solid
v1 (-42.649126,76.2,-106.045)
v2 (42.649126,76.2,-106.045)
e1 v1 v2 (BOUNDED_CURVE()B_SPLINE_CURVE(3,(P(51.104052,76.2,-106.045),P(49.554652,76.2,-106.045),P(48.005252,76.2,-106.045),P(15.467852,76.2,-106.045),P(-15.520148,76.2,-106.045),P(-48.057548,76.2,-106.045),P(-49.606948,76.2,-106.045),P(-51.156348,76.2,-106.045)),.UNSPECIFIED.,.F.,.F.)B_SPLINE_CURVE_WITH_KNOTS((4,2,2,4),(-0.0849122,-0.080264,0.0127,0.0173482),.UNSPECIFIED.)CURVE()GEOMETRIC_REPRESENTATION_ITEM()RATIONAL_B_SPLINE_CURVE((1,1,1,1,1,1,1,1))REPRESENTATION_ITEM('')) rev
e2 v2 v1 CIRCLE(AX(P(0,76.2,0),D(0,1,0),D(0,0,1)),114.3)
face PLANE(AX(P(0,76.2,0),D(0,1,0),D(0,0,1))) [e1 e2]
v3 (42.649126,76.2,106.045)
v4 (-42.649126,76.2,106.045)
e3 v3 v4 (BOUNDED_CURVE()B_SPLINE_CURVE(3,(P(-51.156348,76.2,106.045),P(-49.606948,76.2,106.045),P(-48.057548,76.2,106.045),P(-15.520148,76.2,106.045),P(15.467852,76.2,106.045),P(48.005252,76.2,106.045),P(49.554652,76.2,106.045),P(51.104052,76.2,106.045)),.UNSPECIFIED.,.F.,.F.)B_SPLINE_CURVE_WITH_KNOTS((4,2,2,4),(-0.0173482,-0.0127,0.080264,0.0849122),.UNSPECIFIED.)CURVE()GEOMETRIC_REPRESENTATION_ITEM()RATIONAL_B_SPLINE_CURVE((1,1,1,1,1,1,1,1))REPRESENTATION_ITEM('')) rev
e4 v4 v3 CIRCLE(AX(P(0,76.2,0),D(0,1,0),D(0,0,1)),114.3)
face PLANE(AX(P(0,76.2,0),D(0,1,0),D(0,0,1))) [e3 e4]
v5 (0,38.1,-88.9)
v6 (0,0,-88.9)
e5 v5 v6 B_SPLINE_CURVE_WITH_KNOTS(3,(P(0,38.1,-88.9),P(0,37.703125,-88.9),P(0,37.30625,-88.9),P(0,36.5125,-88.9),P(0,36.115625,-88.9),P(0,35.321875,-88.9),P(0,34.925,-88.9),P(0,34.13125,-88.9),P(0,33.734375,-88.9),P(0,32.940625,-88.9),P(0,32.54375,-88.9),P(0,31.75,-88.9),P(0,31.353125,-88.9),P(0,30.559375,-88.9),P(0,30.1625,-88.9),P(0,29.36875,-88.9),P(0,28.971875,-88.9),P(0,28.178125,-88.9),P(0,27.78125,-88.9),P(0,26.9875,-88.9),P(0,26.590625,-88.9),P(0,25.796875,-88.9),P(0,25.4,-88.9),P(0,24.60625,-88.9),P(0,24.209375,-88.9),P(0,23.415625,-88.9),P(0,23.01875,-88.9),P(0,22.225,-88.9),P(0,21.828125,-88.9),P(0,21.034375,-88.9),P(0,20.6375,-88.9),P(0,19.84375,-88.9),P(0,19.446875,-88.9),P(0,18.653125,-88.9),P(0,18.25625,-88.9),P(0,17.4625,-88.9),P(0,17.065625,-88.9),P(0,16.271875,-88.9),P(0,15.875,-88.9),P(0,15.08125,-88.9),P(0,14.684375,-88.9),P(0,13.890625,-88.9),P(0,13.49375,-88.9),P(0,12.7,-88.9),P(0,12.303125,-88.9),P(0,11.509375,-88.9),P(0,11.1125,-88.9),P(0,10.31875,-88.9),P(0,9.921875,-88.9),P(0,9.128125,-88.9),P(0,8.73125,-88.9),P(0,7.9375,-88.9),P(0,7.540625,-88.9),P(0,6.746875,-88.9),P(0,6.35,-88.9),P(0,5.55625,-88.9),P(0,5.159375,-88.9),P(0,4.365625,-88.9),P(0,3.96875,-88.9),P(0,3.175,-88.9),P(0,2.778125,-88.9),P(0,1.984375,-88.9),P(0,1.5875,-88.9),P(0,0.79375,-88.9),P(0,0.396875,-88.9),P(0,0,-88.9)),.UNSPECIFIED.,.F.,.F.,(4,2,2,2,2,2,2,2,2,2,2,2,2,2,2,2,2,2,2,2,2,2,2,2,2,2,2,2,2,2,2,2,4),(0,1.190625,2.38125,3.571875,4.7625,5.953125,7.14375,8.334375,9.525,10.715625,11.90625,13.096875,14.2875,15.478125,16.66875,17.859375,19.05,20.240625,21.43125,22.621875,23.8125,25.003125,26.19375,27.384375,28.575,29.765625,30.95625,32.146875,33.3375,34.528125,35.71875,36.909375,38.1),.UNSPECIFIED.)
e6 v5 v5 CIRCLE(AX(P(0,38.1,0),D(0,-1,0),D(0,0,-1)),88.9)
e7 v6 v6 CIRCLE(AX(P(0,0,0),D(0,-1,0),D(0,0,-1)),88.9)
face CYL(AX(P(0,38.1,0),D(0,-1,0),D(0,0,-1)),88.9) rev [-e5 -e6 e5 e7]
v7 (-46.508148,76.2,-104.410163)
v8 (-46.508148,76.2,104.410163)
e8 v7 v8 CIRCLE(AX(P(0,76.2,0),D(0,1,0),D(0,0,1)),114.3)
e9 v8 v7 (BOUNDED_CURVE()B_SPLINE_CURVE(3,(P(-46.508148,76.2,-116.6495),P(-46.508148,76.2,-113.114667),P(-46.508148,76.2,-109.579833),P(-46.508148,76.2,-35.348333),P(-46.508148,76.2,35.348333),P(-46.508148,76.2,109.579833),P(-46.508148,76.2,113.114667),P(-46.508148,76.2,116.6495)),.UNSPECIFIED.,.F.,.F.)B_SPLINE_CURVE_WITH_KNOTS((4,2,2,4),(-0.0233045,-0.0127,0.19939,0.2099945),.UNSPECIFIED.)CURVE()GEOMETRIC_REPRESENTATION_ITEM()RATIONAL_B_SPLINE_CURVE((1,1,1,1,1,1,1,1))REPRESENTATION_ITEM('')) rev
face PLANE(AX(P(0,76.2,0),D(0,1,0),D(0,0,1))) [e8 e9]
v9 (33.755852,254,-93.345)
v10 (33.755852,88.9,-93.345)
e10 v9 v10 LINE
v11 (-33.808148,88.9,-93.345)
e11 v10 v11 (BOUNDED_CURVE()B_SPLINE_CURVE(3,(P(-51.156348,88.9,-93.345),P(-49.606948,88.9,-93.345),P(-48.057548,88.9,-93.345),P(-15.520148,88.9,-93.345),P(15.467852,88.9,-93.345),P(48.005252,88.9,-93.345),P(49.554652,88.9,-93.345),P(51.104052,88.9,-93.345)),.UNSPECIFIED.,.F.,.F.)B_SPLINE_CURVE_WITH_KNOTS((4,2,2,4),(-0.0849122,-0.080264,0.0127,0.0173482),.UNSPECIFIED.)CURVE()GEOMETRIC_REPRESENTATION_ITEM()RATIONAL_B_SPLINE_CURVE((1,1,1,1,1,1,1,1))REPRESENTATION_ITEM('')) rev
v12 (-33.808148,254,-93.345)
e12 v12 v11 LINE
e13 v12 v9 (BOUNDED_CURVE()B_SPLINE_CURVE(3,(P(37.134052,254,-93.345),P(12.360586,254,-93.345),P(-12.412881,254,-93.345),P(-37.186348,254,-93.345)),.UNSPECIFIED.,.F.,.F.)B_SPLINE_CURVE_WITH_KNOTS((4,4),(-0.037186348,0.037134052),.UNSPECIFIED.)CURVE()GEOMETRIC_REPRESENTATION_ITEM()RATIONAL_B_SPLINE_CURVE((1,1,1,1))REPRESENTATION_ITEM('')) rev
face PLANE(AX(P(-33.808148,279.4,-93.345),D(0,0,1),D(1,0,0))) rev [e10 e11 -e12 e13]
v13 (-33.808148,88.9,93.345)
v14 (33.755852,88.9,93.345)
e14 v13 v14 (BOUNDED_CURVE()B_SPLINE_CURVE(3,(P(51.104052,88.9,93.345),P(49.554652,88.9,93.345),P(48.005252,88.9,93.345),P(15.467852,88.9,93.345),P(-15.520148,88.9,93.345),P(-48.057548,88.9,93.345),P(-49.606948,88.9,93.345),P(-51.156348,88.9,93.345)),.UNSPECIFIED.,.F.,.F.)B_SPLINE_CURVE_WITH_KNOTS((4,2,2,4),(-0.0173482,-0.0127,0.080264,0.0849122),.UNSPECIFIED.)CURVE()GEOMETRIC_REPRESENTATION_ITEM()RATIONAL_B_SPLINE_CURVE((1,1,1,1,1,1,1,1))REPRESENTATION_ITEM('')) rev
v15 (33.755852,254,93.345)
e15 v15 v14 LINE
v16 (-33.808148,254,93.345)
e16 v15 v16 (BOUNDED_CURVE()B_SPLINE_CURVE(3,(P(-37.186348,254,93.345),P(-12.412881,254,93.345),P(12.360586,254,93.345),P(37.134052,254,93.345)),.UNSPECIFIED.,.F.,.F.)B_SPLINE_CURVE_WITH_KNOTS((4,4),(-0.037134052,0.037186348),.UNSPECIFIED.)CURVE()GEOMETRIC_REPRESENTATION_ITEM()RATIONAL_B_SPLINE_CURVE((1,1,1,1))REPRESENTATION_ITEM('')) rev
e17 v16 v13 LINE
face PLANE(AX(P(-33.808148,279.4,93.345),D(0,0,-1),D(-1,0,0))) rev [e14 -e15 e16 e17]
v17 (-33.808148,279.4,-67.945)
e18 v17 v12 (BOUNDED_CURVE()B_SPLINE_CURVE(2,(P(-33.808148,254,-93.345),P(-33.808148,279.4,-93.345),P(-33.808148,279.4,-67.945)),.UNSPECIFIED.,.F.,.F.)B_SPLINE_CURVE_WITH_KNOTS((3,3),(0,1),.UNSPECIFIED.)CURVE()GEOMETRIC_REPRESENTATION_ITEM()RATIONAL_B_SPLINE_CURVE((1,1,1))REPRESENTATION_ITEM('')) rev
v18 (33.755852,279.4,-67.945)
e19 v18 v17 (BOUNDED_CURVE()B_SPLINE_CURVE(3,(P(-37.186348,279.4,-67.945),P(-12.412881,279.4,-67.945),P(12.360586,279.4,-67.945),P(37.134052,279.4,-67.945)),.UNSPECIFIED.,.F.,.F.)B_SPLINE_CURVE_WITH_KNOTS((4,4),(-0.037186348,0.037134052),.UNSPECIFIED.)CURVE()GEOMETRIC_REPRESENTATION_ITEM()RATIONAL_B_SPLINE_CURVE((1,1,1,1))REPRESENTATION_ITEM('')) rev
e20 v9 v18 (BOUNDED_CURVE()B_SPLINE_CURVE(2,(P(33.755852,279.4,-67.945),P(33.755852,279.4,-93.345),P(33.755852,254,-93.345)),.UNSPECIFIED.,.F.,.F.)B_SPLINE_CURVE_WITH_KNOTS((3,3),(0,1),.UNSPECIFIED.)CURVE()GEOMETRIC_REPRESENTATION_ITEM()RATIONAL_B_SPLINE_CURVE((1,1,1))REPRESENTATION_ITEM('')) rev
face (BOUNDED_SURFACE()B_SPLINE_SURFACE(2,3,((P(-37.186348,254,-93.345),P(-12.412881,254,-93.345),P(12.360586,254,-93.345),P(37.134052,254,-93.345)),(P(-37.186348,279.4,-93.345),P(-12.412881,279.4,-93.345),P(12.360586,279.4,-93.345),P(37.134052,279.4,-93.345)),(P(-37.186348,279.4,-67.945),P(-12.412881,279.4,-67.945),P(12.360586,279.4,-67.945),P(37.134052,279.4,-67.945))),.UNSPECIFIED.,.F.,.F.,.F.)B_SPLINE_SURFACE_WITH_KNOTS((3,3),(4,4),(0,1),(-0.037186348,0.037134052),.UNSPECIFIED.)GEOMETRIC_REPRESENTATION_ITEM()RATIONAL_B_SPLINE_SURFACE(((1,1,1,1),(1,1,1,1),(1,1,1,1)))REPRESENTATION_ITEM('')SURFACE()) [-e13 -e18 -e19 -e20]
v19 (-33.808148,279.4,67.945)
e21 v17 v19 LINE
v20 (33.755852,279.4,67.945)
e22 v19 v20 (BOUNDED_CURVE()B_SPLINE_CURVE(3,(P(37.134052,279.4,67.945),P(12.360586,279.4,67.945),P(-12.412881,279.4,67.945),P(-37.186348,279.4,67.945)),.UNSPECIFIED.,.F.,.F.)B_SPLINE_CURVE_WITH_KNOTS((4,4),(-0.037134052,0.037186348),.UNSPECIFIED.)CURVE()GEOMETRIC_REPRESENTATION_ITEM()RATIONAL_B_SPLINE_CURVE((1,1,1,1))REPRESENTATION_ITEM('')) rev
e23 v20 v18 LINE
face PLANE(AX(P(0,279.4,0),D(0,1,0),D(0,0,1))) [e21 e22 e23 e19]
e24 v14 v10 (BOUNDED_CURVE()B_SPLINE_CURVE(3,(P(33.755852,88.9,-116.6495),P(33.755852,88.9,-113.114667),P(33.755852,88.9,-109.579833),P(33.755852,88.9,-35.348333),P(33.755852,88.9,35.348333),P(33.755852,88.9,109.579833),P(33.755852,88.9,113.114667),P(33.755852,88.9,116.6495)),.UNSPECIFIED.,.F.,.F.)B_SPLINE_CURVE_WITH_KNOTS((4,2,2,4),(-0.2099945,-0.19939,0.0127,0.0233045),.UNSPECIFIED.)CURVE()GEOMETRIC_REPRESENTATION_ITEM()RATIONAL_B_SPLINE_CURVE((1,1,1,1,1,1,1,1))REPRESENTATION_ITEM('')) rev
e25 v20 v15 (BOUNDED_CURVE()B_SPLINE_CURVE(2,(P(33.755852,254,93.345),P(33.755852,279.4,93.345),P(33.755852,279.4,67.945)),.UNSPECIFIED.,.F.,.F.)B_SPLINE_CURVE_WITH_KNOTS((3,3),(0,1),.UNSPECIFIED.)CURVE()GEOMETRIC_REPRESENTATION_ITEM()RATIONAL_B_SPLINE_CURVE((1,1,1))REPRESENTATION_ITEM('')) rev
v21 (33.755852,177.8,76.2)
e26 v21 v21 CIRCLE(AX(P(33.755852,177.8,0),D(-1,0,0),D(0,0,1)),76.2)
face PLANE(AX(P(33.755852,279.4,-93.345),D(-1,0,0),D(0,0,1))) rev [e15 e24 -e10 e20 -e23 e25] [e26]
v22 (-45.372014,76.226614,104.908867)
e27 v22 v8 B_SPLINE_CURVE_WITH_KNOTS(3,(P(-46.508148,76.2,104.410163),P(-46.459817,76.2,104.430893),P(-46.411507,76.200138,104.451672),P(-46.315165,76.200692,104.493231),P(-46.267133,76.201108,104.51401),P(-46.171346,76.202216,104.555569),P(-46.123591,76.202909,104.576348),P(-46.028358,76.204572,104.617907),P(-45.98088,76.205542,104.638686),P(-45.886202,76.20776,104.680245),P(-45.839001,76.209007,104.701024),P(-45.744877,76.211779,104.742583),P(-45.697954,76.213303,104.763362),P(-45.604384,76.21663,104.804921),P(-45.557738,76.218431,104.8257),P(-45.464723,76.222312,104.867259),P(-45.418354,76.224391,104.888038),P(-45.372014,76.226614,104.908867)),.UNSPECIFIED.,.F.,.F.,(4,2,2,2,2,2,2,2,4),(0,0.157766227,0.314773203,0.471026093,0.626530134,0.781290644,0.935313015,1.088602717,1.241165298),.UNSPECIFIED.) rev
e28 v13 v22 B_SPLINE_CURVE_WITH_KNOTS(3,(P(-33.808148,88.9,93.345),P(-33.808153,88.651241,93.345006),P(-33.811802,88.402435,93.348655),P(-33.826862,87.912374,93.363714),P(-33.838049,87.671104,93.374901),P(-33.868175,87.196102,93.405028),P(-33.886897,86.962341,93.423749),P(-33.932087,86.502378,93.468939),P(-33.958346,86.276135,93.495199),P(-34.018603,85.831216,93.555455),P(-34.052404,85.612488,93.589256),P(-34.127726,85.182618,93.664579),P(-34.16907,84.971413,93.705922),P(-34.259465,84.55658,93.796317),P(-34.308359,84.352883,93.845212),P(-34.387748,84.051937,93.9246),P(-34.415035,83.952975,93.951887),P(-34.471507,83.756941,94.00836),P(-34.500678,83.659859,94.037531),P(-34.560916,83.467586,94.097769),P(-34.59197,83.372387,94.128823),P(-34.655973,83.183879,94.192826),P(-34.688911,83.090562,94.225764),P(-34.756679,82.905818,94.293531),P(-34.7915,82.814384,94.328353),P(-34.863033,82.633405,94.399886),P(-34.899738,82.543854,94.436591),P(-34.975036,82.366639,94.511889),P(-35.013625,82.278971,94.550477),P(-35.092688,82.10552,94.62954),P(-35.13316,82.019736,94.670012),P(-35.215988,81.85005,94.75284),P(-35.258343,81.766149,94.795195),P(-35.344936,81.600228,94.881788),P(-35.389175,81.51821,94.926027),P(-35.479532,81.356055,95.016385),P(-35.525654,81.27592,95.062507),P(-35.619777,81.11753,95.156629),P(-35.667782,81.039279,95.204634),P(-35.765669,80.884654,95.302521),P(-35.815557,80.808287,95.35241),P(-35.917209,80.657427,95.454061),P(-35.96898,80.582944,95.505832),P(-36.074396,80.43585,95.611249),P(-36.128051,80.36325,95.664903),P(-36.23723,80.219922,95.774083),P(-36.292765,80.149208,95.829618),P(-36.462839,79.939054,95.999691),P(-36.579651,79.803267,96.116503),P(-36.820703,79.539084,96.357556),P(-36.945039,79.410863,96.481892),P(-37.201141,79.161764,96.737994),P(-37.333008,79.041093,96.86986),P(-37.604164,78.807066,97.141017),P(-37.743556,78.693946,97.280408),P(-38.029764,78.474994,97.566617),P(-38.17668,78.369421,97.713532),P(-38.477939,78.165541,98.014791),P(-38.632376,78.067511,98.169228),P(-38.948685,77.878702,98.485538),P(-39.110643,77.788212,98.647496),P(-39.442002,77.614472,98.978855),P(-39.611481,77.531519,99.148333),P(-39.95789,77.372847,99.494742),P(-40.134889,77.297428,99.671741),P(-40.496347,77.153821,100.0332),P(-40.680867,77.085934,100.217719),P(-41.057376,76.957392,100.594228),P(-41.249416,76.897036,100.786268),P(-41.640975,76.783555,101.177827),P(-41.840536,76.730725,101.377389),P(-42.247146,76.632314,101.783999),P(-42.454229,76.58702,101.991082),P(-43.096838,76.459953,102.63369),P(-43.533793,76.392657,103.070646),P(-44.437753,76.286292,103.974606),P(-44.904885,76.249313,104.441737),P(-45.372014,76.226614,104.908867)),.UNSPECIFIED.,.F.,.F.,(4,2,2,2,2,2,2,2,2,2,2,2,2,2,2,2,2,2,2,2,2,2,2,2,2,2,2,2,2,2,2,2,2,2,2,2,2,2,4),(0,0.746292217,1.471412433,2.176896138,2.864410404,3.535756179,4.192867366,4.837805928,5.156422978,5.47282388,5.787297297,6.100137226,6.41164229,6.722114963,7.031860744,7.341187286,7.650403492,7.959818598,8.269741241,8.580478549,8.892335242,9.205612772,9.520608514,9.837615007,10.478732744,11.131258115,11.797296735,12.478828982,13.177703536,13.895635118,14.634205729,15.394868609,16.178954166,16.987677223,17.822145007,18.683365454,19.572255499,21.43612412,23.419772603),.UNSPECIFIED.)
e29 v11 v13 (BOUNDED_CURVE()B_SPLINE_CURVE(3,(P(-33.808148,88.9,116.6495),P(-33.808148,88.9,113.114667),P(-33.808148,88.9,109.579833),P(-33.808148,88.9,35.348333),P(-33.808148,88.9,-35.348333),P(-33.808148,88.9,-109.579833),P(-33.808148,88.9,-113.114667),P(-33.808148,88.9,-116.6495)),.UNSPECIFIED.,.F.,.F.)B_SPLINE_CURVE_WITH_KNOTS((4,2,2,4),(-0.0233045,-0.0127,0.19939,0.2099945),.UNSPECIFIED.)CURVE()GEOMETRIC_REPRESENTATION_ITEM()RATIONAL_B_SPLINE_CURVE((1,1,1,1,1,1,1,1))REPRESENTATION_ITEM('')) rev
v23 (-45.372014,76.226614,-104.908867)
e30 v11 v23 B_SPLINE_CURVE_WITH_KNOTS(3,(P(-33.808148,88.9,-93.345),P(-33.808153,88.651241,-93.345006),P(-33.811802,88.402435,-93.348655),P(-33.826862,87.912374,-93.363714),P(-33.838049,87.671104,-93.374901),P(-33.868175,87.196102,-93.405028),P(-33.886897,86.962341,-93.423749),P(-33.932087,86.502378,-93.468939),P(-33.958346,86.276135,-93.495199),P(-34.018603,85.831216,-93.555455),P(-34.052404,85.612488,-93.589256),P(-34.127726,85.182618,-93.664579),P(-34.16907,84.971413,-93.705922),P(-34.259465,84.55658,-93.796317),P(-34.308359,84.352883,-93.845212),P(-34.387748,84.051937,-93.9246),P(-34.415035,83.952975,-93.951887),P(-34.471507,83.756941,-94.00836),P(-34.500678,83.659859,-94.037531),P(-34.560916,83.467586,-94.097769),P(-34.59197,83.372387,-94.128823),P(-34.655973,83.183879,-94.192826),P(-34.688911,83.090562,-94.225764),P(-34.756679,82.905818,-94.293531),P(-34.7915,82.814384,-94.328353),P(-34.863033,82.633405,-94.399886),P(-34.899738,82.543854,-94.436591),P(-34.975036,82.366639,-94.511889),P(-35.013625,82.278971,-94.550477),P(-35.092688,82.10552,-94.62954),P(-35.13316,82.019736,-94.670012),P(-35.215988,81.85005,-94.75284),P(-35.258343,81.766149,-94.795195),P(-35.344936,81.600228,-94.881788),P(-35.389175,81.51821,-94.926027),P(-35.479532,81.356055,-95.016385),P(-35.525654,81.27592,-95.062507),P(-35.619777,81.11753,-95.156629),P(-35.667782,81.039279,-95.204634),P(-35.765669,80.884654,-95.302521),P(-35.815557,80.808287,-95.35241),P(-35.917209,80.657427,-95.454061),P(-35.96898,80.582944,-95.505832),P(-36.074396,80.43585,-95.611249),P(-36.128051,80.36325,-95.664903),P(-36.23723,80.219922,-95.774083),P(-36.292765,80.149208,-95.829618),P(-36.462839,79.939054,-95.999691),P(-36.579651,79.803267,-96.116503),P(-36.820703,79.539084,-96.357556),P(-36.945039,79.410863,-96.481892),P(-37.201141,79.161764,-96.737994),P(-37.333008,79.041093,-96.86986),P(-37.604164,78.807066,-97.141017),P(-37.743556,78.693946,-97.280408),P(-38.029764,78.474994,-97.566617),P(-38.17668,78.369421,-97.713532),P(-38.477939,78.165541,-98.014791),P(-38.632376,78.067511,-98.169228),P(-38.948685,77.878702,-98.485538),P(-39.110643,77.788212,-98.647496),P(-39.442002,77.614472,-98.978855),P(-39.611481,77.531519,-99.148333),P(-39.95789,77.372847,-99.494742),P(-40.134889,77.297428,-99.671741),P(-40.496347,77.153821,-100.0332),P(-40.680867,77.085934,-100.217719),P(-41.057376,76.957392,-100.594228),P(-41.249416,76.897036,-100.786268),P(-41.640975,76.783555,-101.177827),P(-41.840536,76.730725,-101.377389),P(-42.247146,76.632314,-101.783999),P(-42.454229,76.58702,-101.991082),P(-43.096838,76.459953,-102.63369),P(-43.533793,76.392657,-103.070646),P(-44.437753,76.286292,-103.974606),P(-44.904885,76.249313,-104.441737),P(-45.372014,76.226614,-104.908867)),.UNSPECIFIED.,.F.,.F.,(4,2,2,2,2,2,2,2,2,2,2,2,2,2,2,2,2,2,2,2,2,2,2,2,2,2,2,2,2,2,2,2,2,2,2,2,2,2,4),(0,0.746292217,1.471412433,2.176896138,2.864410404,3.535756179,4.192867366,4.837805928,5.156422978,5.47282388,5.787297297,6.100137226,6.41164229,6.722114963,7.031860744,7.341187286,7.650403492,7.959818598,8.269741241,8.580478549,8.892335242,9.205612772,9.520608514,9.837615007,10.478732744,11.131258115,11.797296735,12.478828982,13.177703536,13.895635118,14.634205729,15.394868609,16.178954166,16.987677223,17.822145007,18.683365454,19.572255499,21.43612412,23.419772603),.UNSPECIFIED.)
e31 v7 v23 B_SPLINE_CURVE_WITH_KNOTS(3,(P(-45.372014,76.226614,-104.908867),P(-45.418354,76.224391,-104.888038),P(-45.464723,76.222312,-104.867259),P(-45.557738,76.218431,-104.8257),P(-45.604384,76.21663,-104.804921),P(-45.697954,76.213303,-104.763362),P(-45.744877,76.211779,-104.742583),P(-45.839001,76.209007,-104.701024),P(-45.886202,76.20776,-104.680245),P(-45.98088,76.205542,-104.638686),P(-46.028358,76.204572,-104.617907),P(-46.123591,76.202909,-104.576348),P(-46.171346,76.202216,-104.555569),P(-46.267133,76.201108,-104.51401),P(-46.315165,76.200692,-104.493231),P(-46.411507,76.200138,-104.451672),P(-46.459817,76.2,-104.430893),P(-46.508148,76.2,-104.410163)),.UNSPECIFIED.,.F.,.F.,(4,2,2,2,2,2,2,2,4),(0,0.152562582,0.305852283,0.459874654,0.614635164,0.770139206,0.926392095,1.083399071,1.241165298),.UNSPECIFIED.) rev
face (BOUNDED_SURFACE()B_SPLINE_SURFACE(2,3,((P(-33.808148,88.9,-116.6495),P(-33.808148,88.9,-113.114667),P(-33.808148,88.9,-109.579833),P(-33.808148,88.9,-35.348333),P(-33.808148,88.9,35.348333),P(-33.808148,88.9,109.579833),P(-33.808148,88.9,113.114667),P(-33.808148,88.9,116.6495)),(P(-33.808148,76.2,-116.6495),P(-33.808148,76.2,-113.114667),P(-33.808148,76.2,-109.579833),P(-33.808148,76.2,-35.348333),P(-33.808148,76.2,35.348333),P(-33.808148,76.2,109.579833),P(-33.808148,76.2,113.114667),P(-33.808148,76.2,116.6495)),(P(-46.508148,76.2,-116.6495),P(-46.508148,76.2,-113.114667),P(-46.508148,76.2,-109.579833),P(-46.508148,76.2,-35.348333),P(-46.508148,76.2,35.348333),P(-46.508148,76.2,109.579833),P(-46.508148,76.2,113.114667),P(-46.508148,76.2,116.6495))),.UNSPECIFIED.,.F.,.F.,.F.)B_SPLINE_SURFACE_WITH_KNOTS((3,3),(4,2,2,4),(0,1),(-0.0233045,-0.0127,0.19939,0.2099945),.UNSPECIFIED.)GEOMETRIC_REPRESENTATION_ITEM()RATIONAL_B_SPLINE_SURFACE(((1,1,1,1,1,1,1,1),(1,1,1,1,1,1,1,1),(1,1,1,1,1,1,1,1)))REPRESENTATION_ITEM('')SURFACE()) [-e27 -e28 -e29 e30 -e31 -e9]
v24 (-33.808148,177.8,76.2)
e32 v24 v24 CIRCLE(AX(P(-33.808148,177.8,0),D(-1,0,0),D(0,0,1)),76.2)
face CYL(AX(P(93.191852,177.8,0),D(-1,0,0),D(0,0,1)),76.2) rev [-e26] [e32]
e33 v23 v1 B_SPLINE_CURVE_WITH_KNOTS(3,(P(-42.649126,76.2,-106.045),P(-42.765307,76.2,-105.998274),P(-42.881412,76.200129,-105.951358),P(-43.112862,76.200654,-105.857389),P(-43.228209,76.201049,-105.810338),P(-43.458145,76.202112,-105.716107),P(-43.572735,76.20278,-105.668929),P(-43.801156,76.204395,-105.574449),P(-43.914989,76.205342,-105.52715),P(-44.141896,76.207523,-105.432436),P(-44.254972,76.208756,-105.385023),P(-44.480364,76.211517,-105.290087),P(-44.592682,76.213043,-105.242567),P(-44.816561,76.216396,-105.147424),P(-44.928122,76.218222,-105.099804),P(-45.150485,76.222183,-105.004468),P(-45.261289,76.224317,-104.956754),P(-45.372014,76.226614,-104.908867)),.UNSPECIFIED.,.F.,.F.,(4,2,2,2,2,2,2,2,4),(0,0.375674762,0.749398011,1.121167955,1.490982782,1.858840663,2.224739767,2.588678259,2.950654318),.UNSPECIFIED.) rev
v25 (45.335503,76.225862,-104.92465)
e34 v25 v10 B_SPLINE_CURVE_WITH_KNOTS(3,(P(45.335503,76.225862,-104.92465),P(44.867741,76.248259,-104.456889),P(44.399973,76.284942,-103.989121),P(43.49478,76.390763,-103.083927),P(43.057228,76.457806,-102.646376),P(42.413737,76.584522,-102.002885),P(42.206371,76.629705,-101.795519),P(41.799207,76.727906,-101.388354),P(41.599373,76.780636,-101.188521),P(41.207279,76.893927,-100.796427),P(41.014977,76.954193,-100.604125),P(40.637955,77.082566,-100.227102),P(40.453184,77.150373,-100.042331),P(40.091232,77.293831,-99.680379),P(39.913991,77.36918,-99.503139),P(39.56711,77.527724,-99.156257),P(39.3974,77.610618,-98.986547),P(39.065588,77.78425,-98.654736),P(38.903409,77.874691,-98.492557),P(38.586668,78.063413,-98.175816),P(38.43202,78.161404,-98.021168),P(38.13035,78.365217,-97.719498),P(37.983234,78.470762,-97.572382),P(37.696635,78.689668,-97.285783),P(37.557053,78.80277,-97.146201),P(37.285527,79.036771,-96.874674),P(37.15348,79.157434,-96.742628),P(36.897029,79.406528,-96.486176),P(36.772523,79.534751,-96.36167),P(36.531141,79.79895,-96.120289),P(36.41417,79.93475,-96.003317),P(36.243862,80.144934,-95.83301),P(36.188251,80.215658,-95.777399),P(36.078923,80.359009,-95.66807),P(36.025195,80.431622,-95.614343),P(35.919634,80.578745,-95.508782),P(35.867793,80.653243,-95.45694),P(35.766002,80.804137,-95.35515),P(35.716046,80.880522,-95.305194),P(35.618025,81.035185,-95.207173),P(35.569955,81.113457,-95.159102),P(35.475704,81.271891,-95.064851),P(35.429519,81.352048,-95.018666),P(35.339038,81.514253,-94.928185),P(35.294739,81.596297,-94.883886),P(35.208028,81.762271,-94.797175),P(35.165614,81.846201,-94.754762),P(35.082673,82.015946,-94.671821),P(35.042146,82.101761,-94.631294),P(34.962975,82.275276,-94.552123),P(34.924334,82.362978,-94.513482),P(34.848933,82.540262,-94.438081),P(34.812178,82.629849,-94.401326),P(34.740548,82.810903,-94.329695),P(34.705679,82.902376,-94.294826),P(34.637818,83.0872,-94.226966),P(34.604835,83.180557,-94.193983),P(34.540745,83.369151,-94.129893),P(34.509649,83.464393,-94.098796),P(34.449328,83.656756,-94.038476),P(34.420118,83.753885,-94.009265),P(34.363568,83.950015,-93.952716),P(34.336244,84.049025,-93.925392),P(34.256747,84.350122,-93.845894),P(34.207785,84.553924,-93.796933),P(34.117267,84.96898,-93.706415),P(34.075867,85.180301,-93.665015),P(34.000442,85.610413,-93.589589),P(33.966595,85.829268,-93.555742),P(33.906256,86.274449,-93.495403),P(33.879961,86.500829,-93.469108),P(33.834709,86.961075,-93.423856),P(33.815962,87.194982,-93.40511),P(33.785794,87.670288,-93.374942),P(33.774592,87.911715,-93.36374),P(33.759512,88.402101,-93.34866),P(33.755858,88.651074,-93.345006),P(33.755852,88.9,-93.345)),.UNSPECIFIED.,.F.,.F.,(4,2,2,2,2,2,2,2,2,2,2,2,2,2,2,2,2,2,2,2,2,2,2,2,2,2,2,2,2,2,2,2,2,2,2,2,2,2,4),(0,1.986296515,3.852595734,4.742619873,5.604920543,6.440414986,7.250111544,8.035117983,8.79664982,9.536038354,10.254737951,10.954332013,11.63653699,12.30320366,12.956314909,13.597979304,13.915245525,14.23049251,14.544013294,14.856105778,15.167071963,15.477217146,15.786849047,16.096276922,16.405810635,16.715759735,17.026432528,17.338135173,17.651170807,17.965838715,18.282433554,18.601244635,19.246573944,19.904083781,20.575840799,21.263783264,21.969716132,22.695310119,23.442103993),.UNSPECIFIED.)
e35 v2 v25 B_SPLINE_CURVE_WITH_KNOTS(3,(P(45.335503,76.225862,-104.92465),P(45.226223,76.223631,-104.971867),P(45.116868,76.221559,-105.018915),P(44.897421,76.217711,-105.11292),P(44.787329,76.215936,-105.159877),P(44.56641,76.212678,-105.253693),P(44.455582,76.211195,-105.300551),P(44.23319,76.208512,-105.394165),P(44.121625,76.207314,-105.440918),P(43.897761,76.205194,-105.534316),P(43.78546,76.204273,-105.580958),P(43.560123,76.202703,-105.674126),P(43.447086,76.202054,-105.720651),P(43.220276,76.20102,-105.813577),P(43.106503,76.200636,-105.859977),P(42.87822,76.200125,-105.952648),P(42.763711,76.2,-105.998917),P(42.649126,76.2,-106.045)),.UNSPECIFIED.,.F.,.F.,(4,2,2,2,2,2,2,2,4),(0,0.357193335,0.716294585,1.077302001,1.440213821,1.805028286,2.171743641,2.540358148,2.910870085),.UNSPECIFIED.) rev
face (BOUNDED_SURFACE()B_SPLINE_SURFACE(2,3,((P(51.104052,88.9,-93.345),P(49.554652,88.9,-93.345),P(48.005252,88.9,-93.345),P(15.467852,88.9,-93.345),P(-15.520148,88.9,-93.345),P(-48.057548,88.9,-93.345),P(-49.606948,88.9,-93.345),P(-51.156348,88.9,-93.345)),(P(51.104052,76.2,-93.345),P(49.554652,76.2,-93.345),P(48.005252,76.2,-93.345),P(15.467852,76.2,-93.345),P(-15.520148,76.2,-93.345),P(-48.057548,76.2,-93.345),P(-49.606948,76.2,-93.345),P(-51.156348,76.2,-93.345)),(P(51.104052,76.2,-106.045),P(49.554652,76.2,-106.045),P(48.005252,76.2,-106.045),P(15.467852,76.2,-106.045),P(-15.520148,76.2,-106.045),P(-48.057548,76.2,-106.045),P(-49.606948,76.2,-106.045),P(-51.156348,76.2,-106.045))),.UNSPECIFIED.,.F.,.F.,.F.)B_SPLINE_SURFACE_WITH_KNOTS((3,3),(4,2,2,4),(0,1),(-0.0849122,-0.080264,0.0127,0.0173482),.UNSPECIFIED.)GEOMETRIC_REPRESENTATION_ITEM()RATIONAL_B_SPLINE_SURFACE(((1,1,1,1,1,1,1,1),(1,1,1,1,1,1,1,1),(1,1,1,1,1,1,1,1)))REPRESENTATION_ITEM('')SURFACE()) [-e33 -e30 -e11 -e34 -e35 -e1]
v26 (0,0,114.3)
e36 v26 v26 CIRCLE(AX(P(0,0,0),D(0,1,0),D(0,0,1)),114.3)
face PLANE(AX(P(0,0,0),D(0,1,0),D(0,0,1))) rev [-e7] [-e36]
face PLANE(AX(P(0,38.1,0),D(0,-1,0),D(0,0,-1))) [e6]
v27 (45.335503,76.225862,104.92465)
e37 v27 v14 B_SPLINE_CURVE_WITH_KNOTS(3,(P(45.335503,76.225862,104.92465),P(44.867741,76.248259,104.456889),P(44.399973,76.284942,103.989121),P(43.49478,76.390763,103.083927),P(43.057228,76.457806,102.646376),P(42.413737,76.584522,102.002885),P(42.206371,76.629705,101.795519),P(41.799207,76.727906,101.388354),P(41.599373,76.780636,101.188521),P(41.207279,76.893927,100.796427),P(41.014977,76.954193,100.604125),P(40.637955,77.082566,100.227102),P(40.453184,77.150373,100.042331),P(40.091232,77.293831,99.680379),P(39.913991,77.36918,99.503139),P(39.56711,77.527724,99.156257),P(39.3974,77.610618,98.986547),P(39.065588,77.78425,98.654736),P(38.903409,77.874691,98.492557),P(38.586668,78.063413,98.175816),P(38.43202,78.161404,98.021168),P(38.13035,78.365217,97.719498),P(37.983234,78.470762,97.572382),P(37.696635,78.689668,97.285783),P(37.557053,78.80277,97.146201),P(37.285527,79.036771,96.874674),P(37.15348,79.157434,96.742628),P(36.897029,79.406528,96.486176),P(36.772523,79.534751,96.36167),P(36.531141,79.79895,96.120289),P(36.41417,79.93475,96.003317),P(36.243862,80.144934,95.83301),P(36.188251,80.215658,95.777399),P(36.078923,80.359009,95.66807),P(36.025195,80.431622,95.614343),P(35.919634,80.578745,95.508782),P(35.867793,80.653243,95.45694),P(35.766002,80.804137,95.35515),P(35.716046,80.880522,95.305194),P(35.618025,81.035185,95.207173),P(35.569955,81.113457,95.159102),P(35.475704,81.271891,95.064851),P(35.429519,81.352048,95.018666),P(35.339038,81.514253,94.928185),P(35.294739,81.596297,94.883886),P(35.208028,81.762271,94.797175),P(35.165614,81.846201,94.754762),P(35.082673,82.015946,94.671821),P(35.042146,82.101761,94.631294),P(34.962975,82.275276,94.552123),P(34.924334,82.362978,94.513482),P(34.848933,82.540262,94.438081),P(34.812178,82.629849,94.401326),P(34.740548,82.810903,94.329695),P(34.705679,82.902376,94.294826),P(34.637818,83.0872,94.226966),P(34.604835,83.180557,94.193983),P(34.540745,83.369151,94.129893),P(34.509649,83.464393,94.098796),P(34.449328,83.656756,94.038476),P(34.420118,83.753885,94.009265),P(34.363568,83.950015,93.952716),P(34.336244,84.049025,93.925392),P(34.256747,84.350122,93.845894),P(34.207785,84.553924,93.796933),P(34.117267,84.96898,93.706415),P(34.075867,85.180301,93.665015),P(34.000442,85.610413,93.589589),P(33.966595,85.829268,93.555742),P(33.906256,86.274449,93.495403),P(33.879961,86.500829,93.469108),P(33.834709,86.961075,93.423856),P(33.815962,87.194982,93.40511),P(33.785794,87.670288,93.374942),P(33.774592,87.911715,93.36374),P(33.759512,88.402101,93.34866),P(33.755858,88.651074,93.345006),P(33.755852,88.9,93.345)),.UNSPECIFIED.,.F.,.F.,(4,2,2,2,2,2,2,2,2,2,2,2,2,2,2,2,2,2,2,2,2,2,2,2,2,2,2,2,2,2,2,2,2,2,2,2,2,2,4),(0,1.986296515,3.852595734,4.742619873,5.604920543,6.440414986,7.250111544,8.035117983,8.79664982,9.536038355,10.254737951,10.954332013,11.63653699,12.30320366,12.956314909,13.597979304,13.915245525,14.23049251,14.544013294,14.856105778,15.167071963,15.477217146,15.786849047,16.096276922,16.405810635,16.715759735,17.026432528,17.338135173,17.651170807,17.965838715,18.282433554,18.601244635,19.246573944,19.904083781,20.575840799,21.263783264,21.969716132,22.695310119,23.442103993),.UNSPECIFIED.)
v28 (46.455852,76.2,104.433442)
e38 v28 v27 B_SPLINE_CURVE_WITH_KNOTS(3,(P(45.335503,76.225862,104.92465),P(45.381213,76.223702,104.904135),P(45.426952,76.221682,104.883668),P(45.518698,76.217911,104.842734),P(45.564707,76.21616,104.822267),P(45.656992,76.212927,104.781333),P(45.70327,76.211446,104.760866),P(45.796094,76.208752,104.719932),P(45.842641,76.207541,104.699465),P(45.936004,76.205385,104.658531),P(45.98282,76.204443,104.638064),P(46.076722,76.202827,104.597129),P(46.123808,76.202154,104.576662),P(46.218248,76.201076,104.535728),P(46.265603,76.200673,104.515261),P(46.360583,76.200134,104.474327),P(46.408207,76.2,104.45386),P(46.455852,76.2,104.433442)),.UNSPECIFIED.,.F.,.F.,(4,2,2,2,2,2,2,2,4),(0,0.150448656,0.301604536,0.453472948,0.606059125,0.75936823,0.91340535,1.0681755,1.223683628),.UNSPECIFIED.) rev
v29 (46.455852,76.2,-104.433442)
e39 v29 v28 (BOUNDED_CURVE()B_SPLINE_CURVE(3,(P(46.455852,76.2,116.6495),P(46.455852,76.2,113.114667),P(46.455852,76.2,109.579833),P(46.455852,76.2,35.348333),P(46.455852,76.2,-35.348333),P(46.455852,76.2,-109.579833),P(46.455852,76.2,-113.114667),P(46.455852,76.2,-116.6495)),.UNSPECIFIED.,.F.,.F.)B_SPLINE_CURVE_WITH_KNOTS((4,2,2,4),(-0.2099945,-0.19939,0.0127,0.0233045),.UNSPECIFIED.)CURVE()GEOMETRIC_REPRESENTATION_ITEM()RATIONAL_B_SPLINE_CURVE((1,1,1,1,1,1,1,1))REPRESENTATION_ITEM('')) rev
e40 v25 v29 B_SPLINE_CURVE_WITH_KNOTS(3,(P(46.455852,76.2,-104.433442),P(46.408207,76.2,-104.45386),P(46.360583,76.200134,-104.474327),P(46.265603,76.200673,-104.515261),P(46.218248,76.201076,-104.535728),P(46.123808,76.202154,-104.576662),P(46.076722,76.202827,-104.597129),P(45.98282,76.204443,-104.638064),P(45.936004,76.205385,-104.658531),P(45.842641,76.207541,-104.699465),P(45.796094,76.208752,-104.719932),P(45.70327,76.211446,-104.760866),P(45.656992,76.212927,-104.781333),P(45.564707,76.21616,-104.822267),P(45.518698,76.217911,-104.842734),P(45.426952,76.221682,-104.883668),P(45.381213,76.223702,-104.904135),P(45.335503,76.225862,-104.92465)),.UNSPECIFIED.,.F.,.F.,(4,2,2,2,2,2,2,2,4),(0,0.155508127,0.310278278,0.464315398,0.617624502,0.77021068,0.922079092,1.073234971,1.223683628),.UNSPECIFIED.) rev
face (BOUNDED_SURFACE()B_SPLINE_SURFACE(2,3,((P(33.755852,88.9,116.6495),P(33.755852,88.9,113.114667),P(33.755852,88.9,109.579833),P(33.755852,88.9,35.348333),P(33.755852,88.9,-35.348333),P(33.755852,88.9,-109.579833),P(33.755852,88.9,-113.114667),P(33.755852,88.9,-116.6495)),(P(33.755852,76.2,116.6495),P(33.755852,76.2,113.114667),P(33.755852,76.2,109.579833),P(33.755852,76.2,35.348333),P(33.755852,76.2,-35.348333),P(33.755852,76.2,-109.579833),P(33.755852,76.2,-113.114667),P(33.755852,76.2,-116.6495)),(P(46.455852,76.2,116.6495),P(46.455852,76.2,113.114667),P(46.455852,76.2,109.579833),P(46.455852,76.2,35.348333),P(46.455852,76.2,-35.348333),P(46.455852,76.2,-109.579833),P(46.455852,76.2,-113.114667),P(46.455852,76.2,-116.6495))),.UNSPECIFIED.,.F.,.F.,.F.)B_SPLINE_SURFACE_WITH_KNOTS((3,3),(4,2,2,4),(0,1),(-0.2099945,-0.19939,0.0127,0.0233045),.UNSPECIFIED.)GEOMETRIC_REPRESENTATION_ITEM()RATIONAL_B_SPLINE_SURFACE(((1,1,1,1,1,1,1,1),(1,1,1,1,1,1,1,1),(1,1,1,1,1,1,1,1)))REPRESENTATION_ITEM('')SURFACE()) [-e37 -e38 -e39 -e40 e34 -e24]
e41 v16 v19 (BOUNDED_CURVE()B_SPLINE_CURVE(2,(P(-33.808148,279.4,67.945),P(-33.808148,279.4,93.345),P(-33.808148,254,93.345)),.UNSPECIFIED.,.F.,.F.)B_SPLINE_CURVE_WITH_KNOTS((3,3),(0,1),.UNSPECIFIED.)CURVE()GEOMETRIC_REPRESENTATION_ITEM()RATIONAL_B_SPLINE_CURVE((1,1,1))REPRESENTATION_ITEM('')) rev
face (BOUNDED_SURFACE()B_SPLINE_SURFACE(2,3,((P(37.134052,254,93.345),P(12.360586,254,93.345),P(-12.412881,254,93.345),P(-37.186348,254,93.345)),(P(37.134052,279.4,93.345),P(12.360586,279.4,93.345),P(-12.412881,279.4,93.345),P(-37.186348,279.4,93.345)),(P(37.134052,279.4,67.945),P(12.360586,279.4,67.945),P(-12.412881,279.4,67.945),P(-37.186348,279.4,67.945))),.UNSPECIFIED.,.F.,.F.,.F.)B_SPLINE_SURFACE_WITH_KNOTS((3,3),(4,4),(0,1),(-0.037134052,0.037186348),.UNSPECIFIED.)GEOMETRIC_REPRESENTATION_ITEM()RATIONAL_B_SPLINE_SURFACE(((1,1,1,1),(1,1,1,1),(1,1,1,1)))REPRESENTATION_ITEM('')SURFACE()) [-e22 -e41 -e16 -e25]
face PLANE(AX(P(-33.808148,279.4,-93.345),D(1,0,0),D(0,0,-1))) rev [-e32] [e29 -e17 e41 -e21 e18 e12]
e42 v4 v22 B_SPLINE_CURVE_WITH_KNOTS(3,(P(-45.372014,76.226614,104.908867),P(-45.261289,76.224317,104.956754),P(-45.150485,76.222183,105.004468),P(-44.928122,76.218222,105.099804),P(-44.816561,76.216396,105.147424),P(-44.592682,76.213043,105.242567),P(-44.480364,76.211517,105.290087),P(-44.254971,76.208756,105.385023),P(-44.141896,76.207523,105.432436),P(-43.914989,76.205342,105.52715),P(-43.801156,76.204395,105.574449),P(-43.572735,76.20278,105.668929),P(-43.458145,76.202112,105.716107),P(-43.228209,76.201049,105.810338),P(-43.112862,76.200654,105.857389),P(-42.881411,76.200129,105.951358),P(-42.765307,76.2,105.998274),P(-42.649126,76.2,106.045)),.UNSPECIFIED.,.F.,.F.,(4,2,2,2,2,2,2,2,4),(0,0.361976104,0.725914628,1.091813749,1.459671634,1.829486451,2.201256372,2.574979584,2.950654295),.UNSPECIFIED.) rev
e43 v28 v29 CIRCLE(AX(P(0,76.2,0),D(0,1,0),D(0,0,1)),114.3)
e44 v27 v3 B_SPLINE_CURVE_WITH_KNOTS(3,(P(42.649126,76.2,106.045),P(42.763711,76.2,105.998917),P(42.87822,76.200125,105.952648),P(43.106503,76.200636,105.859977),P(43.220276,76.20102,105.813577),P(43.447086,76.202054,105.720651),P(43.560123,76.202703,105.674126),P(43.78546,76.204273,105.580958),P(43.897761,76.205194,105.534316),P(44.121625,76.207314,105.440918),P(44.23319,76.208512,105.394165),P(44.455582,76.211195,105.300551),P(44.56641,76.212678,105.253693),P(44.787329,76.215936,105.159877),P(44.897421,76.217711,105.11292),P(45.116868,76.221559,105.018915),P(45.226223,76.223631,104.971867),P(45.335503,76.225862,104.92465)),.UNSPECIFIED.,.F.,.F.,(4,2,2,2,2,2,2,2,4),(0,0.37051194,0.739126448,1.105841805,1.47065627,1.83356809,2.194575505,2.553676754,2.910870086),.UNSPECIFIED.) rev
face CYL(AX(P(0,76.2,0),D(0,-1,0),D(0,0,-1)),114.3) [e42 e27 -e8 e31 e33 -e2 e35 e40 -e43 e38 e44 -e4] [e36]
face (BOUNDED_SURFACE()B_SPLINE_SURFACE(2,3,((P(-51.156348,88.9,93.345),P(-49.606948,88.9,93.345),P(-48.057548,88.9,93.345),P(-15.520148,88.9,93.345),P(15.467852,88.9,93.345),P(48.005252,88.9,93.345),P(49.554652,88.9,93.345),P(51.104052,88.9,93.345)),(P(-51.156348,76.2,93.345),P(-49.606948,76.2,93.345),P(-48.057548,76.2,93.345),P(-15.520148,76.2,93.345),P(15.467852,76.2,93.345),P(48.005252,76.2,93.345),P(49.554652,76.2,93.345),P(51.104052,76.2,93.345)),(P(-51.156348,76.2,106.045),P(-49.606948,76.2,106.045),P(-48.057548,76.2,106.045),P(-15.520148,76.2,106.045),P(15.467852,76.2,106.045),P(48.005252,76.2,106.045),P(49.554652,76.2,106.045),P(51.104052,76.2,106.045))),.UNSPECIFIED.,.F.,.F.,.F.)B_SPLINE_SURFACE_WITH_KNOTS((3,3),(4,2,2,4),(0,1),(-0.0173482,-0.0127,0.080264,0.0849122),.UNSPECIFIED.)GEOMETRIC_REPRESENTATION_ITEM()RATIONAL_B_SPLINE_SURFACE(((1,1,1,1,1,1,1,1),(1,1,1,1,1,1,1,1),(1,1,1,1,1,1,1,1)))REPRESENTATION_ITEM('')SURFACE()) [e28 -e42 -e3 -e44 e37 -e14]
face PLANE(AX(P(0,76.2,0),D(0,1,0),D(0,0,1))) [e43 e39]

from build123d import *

# Parameters (mm, degrees)
SKETCH1_R           = 114.3
BOSS_EXTRUDE1_DEPTH = 76.2
SKETCH3_W           = 67.564
SKETCH3_H           = 186.69
BOSS_EXTRUDE3_DEPTH = 203.2
SKETCH4_R           = 76.2
CUT_EXTRUDE1_DEPTH  = 127
FILLET1_SIZE        = 25.4
FILLET2_SIZE        = 12.7
SKETCH2_R           = 88.9
CUT_EXTRUDE2_DEPTH  = 38.1


with BuildPart() as part:
    # Sketch1 → Boss-Extrude1 (new body)
    with BuildSketch(Plane(origin=(0, 0, 0), x_dir=(1, 0, 0), z_dir=(0, 1, 0))):
        with Locations(Location((0, 0, 0), (0, 0, 90))):
            Circle(SKETCH1_R)
    extrude(amount=BOSS_EXTRUDE1_DEPTH)

    # Sketch3 → Boss-Extrude3 (add)
    with BuildSketch(Plane(origin=(0, 76.2, 0), x_dir=(1, 0, 0), z_dir=(0, 1, 0))):
        with Locations((-0.02614759, 0)):
            Rectangle(SKETCH3_W, SKETCH3_H)
    extrude(amount=BOSS_EXTRUDE3_DEPTH)

    # Sketch4 → Cut-Extrude1 (cut)
    with BuildSketch(Plane.ZY.offset(33.80814759)):
        with Locations((0, 177.8)):
            Circle(SKETCH4_R)
    extrude(amount=-CUT_EXTRUDE1_DEPTH, mode=Mode.SUBTRACT)

    # Fillet1
    # a fillet whose section is not a circle: 25.4 mm, written as the material it takes off along each edge
    with BuildSketch(Plane(origin=(97.25585241, 279.4, 93.345), x_dir=(0, -1, 0), z_dir=(-1, 0, 0)), Plane(origin=(-97.30814759, 279.4, -93.345), x_dir=(0, -1, 0), z_dir=(1, 0, 0))) as fillet1_piece_1:
        with BuildLine():
            Bezier((FILLET1_SIZE, 0), (0, 0), (0, -FILLET1_SIZE), weights=[1, 1, 1])
            Line((0, -FILLET1_SIZE), (0, 0))
            Line((0, 0), (FILLET1_SIZE, 0))
        make_face()
    extrude(amount=194.564, mode=Mode.SUBTRACT)

    # Fillet2
    # a fillet whose section is not a circle: 12.7 mm, written as the material it adds along each edge
    with BuildSketch(Plane(origin=(33.75585241, 76.2, 93.345), x_dir=(0, 0, 1), z_dir=(-1, 0, 0)), Plane(origin=(-33.80814759, 76.2, -93.345), x_dir=(0, 0, -1), z_dir=(1, 0, 0))) as fillet2_piece_1:
        with BuildLine():
            Bezier((FILLET2_SIZE, 0), (0, 0), (0, FILLET2_SIZE), weights=[1, 1, 1])
            Line((0, FILLET2_SIZE), (0, 0))
            Line((0, 0), (FILLET2_SIZE, 0))
        make_face()
    extrude(amount=67.564)
    with BuildSketch(Plane(origin=(-33.80814759, 76.2, 93.345), x_dir=(-1, 0, 0), z_dir=(0, 0, -1)), Plane(origin=(33.75585241, 76.2, -93.345), x_dir=(1, 0, 0), z_dir=(0, 0, 1))) as fillet2_piece_2:
        with BuildLine():
            Bezier((FILLET2_SIZE, 0), (0, 0), (0, FILLET2_SIZE), weights=[1, 1, 1])
            Line((0, FILLET2_SIZE), (0, 0))
            Line((0, 0), (FILLET2_SIZE, 0))
        make_face()
    extrude(amount=186.69)
    with BuildSketch(Plane(origin=(65.50585241, 76.2, 93.345), x_dir=(0, 0, 1), z_dir=(-1, 0, 0))) as fillet2_piece_3a_section:
        with BuildLine():
            Bezier((FILLET2_SIZE, 0), (0, 0), (0, FILLET2_SIZE), weights=[1, 1, 1])
            Line((0, FILLET2_SIZE), (0, 0))
            Line((0, 0), (FILLET2_SIZE, 0))
        make_face()
    fillet2_piece_3a = extrude(amount=99.314, mode=Mode.PRIVATE)
    fillet2_piece_3a = fillet2_piece_3a & Plane(origin=(0, 76.2, 0), x_dir=(0, 0, -1), z_dir=(0, -1, 0)) * Cylinder(114.3, 250, mode=Mode.PRIVATE)
    fillet2_piece_3a = split(fillet2_piece_3a, bisect_by=Plane(origin=(33.75585241, 76.2, 93.345), z_dir=(1, 0, 0)), keep=Keep.TOP, mode=Mode.PRIVATE)
    with BuildSketch(Plane(origin=(33.75585241, 76.2, -93.345), x_dir=(1, 0, 0), z_dir=(0, 0, 1))) as fillet2_piece_3b_section:
        with BuildLine():
            Bezier((FILLET2_SIZE, 0), (0, 0), (0, FILLET2_SIZE), weights=[1, 1, 1])
            Line((0, FILLET2_SIZE), (0, 0))
            Line((0, 0), (FILLET2_SIZE, 0))
        make_face()
    fillet2_piece_3b = extrude(amount=218.44, mode=Mode.PRIVATE)
    fillet2_piece_3b = fillet2_piece_3b & Plane(origin=(0, 76.2, 0), x_dir=(0, 0, -1), z_dir=(0, -1, 0)) * Cylinder(114.3, 488, mode=Mode.PRIVATE)
    fillet2_piece_3b = split(fillet2_piece_3b, bisect_by=Plane(origin=(33.75585241, 76.2, 93.345), z_dir=(0, 0, 1)), keep=Keep.TOP, mode=Mode.PRIVATE)
    fillet2_piece_3 = fillet2_piece_3a & fillet2_piece_3b
    add(fillet2_piece_3)
    with BuildSketch(Plane(origin=(-33.80814759, 76.2, 125.095), x_dir=(-1, 0, 0), z_dir=(0, 0, -1))) as fillet2_piece_4a_section:
        with BuildLine():
            Bezier((FILLET2_SIZE, 0), (0, 0), (0, FILLET2_SIZE), weights=[1, 1, 1])
            Line((0, FILLET2_SIZE), (0, 0))
            Line((0, 0), (FILLET2_SIZE, 0))
        make_face()
    fillet2_piece_4a = extrude(amount=218.44, mode=Mode.PRIVATE)
    fillet2_piece_4a = fillet2_piece_4a & Plane(origin=(0, 76.2, 0), x_dir=(0, 0, -1), z_dir=(0, -1, 0)) * Cylinder(114.3, 488, mode=Mode.PRIVATE)
    fillet2_piece_4a = split(fillet2_piece_4a, bisect_by=Plane(origin=(-33.80814759, 76.2, 93.345), z_dir=(0, 0, 1)), keep=Keep.TOP, mode=Mode.PRIVATE)
    with BuildSketch(Plane(origin=(33.75585241, 76.2, 93.345), x_dir=(0, 0, 1), z_dir=(-1, 0, 0))) as fillet2_piece_4b_section:
        with BuildLine():
            Bezier((FILLET2_SIZE, 0), (0, 0), (0, FILLET2_SIZE), weights=[1, 1, 1])
            Line((0, FILLET2_SIZE), (0, 0))
            Line((0, 0), (FILLET2_SIZE, 0))
        make_face()
    fillet2_piece_4b = extrude(amount=99.314, mode=Mode.PRIVATE)
    fillet2_piece_4b = fillet2_piece_4b & Plane(origin=(0, 76.2, 0), x_dir=(0, 0, -1), z_dir=(0, -1, 0)) * Cylinder(114.3, 250, mode=Mode.PRIVATE)
    fillet2_piece_4b = split(fillet2_piece_4b, bisect_by=Plane(origin=(-33.80814759, 76.2, 93.345), z_dir=(-1, 0, 0)), keep=Keep.TOP, mode=Mode.PRIVATE)
    fillet2_piece_4 = fillet2_piece_4a & fillet2_piece_4b
    add(fillet2_piece_4)
    with BuildSketch(Plane(origin=(-33.80814759, 76.2, 93.345), x_dir=(-1, 0, 0), z_dir=(0, 0, -1))) as fillet2_piece_5a_section:
        with BuildLine():
            Bezier((FILLET2_SIZE, 0), (0, 0), (0, FILLET2_SIZE), weights=[1, 1, 1])
            Line((0, FILLET2_SIZE), (0, 0))
            Line((0, 0), (FILLET2_SIZE, 0))
        make_face()
    fillet2_piece_5a = extrude(amount=218.44, mode=Mode.PRIVATE)
    fillet2_piece_5a = fillet2_piece_5a & Plane(origin=(0, 76.2, 0), x_dir=(0, 0, -1), z_dir=(0, -1, 0)) * Cylinder(114.3, 488, mode=Mode.PRIVATE)
    fillet2_piece_5a = split(fillet2_piece_5a, bisect_by=Plane(origin=(-33.80814759, 76.2, -93.345), z_dir=(0, 0, -1)), keep=Keep.TOP, mode=Mode.PRIVATE)
    with BuildSketch(Plane(origin=(-65.55814759, 76.2, -93.345), x_dir=(0, 0, -1), z_dir=(1, 0, 0))) as fillet2_piece_5b_section:
        with BuildLine():
            Bezier((FILLET2_SIZE, 0), (0, 0), (0, FILLET2_SIZE), weights=[1, 1, 1])
            Line((0, FILLET2_SIZE), (0, 0))
            Line((0, 0), (FILLET2_SIZE, 0))
        make_face()
    fillet2_piece_5b = extrude(amount=99.314, mode=Mode.PRIVATE)
    fillet2_piece_5b = fillet2_piece_5b & Plane(origin=(0, 76.2, 0), x_dir=(0, 0, -1), z_dir=(0, -1, 0)) * Cylinder(114.3, 250, mode=Mode.PRIVATE)
    fillet2_piece_5b = split(fillet2_piece_5b, bisect_by=Plane(origin=(-33.80814759, 76.2, -93.345), z_dir=(-1, 0, 0)), keep=Keep.TOP, mode=Mode.PRIVATE)
    fillet2_piece_5 = fillet2_piece_5a & fillet2_piece_5b
    add(fillet2_piece_5)
    with BuildSketch(Plane(origin=(33.75585241, 76.2, -125.095), x_dir=(1, 0, 0), z_dir=(0, 0, 1))) as fillet2_piece_6a_section:
        with BuildLine():
            Bezier((FILLET2_SIZE, 0), (0, 0), (0, FILLET2_SIZE), weights=[1, 1, 1])
            Line((0, FILLET2_SIZE), (0, 0))
            Line((0, 0), (FILLET2_SIZE, 0))
        make_face()
    fillet2_piece_6a = extrude(amount=218.44, mode=Mode.PRIVATE)
    fillet2_piece_6a = fillet2_piece_6a & Plane(origin=(0, 76.2, 0), x_dir=(0, 0, -1), z_dir=(0, -1, 0)) * Cylinder(114.3, 488, mode=Mode.PRIVATE)
    fillet2_piece_6a = split(fillet2_piece_6a, bisect_by=Plane(origin=(33.75585241, 76.2, -93.345), z_dir=(0, 0, -1)), keep=Keep.TOP, mode=Mode.PRIVATE)
    with BuildSketch(Plane(origin=(-33.80814759, 76.2, -93.345), x_dir=(0, 0, -1), z_dir=(1, 0, 0))) as fillet2_piece_6b_section:
        with BuildLine():
            Bezier((FILLET2_SIZE, 0), (0, 0), (0, FILLET2_SIZE), weights=[1, 1, 1])
            Line((0, FILLET2_SIZE), (0, 0))
            Line((0, 0), (FILLET2_SIZE, 0))
        make_face()
    fillet2_piece_6b = extrude(amount=99.314, mode=Mode.PRIVATE)
    fillet2_piece_6b = fillet2_piece_6b & Plane(origin=(0, 76.2, 0), x_dir=(0, 0, -1), z_dir=(0, -1, 0)) * Cylinder(114.3, 250, mode=Mode.PRIVATE)
    fillet2_piece_6b = split(fillet2_piece_6b, bisect_by=Plane(origin=(33.75585241, 76.2, -93.345), z_dir=(1, 0, 0)), keep=Keep.TOP, mode=Mode.PRIVATE)
    fillet2_piece_6 = fillet2_piece_6a & fillet2_piece_6b
    add(fillet2_piece_6)

    # Sketch2 → Cut-Extrude2 (cut)
    with BuildSketch(Plane(origin=(0, 0, 0), x_dir=(-1, 0, 0), z_dir=(0, -1, 0))):
        with Locations(Location((0, 0, 0), (0, 0, 90))):
            Circle(SKETCH2_R)
    extrude(amount=-CUT_EXTRUDE2_DEPTH, mode=Mode.SUBTRACT)


solid = part.part
